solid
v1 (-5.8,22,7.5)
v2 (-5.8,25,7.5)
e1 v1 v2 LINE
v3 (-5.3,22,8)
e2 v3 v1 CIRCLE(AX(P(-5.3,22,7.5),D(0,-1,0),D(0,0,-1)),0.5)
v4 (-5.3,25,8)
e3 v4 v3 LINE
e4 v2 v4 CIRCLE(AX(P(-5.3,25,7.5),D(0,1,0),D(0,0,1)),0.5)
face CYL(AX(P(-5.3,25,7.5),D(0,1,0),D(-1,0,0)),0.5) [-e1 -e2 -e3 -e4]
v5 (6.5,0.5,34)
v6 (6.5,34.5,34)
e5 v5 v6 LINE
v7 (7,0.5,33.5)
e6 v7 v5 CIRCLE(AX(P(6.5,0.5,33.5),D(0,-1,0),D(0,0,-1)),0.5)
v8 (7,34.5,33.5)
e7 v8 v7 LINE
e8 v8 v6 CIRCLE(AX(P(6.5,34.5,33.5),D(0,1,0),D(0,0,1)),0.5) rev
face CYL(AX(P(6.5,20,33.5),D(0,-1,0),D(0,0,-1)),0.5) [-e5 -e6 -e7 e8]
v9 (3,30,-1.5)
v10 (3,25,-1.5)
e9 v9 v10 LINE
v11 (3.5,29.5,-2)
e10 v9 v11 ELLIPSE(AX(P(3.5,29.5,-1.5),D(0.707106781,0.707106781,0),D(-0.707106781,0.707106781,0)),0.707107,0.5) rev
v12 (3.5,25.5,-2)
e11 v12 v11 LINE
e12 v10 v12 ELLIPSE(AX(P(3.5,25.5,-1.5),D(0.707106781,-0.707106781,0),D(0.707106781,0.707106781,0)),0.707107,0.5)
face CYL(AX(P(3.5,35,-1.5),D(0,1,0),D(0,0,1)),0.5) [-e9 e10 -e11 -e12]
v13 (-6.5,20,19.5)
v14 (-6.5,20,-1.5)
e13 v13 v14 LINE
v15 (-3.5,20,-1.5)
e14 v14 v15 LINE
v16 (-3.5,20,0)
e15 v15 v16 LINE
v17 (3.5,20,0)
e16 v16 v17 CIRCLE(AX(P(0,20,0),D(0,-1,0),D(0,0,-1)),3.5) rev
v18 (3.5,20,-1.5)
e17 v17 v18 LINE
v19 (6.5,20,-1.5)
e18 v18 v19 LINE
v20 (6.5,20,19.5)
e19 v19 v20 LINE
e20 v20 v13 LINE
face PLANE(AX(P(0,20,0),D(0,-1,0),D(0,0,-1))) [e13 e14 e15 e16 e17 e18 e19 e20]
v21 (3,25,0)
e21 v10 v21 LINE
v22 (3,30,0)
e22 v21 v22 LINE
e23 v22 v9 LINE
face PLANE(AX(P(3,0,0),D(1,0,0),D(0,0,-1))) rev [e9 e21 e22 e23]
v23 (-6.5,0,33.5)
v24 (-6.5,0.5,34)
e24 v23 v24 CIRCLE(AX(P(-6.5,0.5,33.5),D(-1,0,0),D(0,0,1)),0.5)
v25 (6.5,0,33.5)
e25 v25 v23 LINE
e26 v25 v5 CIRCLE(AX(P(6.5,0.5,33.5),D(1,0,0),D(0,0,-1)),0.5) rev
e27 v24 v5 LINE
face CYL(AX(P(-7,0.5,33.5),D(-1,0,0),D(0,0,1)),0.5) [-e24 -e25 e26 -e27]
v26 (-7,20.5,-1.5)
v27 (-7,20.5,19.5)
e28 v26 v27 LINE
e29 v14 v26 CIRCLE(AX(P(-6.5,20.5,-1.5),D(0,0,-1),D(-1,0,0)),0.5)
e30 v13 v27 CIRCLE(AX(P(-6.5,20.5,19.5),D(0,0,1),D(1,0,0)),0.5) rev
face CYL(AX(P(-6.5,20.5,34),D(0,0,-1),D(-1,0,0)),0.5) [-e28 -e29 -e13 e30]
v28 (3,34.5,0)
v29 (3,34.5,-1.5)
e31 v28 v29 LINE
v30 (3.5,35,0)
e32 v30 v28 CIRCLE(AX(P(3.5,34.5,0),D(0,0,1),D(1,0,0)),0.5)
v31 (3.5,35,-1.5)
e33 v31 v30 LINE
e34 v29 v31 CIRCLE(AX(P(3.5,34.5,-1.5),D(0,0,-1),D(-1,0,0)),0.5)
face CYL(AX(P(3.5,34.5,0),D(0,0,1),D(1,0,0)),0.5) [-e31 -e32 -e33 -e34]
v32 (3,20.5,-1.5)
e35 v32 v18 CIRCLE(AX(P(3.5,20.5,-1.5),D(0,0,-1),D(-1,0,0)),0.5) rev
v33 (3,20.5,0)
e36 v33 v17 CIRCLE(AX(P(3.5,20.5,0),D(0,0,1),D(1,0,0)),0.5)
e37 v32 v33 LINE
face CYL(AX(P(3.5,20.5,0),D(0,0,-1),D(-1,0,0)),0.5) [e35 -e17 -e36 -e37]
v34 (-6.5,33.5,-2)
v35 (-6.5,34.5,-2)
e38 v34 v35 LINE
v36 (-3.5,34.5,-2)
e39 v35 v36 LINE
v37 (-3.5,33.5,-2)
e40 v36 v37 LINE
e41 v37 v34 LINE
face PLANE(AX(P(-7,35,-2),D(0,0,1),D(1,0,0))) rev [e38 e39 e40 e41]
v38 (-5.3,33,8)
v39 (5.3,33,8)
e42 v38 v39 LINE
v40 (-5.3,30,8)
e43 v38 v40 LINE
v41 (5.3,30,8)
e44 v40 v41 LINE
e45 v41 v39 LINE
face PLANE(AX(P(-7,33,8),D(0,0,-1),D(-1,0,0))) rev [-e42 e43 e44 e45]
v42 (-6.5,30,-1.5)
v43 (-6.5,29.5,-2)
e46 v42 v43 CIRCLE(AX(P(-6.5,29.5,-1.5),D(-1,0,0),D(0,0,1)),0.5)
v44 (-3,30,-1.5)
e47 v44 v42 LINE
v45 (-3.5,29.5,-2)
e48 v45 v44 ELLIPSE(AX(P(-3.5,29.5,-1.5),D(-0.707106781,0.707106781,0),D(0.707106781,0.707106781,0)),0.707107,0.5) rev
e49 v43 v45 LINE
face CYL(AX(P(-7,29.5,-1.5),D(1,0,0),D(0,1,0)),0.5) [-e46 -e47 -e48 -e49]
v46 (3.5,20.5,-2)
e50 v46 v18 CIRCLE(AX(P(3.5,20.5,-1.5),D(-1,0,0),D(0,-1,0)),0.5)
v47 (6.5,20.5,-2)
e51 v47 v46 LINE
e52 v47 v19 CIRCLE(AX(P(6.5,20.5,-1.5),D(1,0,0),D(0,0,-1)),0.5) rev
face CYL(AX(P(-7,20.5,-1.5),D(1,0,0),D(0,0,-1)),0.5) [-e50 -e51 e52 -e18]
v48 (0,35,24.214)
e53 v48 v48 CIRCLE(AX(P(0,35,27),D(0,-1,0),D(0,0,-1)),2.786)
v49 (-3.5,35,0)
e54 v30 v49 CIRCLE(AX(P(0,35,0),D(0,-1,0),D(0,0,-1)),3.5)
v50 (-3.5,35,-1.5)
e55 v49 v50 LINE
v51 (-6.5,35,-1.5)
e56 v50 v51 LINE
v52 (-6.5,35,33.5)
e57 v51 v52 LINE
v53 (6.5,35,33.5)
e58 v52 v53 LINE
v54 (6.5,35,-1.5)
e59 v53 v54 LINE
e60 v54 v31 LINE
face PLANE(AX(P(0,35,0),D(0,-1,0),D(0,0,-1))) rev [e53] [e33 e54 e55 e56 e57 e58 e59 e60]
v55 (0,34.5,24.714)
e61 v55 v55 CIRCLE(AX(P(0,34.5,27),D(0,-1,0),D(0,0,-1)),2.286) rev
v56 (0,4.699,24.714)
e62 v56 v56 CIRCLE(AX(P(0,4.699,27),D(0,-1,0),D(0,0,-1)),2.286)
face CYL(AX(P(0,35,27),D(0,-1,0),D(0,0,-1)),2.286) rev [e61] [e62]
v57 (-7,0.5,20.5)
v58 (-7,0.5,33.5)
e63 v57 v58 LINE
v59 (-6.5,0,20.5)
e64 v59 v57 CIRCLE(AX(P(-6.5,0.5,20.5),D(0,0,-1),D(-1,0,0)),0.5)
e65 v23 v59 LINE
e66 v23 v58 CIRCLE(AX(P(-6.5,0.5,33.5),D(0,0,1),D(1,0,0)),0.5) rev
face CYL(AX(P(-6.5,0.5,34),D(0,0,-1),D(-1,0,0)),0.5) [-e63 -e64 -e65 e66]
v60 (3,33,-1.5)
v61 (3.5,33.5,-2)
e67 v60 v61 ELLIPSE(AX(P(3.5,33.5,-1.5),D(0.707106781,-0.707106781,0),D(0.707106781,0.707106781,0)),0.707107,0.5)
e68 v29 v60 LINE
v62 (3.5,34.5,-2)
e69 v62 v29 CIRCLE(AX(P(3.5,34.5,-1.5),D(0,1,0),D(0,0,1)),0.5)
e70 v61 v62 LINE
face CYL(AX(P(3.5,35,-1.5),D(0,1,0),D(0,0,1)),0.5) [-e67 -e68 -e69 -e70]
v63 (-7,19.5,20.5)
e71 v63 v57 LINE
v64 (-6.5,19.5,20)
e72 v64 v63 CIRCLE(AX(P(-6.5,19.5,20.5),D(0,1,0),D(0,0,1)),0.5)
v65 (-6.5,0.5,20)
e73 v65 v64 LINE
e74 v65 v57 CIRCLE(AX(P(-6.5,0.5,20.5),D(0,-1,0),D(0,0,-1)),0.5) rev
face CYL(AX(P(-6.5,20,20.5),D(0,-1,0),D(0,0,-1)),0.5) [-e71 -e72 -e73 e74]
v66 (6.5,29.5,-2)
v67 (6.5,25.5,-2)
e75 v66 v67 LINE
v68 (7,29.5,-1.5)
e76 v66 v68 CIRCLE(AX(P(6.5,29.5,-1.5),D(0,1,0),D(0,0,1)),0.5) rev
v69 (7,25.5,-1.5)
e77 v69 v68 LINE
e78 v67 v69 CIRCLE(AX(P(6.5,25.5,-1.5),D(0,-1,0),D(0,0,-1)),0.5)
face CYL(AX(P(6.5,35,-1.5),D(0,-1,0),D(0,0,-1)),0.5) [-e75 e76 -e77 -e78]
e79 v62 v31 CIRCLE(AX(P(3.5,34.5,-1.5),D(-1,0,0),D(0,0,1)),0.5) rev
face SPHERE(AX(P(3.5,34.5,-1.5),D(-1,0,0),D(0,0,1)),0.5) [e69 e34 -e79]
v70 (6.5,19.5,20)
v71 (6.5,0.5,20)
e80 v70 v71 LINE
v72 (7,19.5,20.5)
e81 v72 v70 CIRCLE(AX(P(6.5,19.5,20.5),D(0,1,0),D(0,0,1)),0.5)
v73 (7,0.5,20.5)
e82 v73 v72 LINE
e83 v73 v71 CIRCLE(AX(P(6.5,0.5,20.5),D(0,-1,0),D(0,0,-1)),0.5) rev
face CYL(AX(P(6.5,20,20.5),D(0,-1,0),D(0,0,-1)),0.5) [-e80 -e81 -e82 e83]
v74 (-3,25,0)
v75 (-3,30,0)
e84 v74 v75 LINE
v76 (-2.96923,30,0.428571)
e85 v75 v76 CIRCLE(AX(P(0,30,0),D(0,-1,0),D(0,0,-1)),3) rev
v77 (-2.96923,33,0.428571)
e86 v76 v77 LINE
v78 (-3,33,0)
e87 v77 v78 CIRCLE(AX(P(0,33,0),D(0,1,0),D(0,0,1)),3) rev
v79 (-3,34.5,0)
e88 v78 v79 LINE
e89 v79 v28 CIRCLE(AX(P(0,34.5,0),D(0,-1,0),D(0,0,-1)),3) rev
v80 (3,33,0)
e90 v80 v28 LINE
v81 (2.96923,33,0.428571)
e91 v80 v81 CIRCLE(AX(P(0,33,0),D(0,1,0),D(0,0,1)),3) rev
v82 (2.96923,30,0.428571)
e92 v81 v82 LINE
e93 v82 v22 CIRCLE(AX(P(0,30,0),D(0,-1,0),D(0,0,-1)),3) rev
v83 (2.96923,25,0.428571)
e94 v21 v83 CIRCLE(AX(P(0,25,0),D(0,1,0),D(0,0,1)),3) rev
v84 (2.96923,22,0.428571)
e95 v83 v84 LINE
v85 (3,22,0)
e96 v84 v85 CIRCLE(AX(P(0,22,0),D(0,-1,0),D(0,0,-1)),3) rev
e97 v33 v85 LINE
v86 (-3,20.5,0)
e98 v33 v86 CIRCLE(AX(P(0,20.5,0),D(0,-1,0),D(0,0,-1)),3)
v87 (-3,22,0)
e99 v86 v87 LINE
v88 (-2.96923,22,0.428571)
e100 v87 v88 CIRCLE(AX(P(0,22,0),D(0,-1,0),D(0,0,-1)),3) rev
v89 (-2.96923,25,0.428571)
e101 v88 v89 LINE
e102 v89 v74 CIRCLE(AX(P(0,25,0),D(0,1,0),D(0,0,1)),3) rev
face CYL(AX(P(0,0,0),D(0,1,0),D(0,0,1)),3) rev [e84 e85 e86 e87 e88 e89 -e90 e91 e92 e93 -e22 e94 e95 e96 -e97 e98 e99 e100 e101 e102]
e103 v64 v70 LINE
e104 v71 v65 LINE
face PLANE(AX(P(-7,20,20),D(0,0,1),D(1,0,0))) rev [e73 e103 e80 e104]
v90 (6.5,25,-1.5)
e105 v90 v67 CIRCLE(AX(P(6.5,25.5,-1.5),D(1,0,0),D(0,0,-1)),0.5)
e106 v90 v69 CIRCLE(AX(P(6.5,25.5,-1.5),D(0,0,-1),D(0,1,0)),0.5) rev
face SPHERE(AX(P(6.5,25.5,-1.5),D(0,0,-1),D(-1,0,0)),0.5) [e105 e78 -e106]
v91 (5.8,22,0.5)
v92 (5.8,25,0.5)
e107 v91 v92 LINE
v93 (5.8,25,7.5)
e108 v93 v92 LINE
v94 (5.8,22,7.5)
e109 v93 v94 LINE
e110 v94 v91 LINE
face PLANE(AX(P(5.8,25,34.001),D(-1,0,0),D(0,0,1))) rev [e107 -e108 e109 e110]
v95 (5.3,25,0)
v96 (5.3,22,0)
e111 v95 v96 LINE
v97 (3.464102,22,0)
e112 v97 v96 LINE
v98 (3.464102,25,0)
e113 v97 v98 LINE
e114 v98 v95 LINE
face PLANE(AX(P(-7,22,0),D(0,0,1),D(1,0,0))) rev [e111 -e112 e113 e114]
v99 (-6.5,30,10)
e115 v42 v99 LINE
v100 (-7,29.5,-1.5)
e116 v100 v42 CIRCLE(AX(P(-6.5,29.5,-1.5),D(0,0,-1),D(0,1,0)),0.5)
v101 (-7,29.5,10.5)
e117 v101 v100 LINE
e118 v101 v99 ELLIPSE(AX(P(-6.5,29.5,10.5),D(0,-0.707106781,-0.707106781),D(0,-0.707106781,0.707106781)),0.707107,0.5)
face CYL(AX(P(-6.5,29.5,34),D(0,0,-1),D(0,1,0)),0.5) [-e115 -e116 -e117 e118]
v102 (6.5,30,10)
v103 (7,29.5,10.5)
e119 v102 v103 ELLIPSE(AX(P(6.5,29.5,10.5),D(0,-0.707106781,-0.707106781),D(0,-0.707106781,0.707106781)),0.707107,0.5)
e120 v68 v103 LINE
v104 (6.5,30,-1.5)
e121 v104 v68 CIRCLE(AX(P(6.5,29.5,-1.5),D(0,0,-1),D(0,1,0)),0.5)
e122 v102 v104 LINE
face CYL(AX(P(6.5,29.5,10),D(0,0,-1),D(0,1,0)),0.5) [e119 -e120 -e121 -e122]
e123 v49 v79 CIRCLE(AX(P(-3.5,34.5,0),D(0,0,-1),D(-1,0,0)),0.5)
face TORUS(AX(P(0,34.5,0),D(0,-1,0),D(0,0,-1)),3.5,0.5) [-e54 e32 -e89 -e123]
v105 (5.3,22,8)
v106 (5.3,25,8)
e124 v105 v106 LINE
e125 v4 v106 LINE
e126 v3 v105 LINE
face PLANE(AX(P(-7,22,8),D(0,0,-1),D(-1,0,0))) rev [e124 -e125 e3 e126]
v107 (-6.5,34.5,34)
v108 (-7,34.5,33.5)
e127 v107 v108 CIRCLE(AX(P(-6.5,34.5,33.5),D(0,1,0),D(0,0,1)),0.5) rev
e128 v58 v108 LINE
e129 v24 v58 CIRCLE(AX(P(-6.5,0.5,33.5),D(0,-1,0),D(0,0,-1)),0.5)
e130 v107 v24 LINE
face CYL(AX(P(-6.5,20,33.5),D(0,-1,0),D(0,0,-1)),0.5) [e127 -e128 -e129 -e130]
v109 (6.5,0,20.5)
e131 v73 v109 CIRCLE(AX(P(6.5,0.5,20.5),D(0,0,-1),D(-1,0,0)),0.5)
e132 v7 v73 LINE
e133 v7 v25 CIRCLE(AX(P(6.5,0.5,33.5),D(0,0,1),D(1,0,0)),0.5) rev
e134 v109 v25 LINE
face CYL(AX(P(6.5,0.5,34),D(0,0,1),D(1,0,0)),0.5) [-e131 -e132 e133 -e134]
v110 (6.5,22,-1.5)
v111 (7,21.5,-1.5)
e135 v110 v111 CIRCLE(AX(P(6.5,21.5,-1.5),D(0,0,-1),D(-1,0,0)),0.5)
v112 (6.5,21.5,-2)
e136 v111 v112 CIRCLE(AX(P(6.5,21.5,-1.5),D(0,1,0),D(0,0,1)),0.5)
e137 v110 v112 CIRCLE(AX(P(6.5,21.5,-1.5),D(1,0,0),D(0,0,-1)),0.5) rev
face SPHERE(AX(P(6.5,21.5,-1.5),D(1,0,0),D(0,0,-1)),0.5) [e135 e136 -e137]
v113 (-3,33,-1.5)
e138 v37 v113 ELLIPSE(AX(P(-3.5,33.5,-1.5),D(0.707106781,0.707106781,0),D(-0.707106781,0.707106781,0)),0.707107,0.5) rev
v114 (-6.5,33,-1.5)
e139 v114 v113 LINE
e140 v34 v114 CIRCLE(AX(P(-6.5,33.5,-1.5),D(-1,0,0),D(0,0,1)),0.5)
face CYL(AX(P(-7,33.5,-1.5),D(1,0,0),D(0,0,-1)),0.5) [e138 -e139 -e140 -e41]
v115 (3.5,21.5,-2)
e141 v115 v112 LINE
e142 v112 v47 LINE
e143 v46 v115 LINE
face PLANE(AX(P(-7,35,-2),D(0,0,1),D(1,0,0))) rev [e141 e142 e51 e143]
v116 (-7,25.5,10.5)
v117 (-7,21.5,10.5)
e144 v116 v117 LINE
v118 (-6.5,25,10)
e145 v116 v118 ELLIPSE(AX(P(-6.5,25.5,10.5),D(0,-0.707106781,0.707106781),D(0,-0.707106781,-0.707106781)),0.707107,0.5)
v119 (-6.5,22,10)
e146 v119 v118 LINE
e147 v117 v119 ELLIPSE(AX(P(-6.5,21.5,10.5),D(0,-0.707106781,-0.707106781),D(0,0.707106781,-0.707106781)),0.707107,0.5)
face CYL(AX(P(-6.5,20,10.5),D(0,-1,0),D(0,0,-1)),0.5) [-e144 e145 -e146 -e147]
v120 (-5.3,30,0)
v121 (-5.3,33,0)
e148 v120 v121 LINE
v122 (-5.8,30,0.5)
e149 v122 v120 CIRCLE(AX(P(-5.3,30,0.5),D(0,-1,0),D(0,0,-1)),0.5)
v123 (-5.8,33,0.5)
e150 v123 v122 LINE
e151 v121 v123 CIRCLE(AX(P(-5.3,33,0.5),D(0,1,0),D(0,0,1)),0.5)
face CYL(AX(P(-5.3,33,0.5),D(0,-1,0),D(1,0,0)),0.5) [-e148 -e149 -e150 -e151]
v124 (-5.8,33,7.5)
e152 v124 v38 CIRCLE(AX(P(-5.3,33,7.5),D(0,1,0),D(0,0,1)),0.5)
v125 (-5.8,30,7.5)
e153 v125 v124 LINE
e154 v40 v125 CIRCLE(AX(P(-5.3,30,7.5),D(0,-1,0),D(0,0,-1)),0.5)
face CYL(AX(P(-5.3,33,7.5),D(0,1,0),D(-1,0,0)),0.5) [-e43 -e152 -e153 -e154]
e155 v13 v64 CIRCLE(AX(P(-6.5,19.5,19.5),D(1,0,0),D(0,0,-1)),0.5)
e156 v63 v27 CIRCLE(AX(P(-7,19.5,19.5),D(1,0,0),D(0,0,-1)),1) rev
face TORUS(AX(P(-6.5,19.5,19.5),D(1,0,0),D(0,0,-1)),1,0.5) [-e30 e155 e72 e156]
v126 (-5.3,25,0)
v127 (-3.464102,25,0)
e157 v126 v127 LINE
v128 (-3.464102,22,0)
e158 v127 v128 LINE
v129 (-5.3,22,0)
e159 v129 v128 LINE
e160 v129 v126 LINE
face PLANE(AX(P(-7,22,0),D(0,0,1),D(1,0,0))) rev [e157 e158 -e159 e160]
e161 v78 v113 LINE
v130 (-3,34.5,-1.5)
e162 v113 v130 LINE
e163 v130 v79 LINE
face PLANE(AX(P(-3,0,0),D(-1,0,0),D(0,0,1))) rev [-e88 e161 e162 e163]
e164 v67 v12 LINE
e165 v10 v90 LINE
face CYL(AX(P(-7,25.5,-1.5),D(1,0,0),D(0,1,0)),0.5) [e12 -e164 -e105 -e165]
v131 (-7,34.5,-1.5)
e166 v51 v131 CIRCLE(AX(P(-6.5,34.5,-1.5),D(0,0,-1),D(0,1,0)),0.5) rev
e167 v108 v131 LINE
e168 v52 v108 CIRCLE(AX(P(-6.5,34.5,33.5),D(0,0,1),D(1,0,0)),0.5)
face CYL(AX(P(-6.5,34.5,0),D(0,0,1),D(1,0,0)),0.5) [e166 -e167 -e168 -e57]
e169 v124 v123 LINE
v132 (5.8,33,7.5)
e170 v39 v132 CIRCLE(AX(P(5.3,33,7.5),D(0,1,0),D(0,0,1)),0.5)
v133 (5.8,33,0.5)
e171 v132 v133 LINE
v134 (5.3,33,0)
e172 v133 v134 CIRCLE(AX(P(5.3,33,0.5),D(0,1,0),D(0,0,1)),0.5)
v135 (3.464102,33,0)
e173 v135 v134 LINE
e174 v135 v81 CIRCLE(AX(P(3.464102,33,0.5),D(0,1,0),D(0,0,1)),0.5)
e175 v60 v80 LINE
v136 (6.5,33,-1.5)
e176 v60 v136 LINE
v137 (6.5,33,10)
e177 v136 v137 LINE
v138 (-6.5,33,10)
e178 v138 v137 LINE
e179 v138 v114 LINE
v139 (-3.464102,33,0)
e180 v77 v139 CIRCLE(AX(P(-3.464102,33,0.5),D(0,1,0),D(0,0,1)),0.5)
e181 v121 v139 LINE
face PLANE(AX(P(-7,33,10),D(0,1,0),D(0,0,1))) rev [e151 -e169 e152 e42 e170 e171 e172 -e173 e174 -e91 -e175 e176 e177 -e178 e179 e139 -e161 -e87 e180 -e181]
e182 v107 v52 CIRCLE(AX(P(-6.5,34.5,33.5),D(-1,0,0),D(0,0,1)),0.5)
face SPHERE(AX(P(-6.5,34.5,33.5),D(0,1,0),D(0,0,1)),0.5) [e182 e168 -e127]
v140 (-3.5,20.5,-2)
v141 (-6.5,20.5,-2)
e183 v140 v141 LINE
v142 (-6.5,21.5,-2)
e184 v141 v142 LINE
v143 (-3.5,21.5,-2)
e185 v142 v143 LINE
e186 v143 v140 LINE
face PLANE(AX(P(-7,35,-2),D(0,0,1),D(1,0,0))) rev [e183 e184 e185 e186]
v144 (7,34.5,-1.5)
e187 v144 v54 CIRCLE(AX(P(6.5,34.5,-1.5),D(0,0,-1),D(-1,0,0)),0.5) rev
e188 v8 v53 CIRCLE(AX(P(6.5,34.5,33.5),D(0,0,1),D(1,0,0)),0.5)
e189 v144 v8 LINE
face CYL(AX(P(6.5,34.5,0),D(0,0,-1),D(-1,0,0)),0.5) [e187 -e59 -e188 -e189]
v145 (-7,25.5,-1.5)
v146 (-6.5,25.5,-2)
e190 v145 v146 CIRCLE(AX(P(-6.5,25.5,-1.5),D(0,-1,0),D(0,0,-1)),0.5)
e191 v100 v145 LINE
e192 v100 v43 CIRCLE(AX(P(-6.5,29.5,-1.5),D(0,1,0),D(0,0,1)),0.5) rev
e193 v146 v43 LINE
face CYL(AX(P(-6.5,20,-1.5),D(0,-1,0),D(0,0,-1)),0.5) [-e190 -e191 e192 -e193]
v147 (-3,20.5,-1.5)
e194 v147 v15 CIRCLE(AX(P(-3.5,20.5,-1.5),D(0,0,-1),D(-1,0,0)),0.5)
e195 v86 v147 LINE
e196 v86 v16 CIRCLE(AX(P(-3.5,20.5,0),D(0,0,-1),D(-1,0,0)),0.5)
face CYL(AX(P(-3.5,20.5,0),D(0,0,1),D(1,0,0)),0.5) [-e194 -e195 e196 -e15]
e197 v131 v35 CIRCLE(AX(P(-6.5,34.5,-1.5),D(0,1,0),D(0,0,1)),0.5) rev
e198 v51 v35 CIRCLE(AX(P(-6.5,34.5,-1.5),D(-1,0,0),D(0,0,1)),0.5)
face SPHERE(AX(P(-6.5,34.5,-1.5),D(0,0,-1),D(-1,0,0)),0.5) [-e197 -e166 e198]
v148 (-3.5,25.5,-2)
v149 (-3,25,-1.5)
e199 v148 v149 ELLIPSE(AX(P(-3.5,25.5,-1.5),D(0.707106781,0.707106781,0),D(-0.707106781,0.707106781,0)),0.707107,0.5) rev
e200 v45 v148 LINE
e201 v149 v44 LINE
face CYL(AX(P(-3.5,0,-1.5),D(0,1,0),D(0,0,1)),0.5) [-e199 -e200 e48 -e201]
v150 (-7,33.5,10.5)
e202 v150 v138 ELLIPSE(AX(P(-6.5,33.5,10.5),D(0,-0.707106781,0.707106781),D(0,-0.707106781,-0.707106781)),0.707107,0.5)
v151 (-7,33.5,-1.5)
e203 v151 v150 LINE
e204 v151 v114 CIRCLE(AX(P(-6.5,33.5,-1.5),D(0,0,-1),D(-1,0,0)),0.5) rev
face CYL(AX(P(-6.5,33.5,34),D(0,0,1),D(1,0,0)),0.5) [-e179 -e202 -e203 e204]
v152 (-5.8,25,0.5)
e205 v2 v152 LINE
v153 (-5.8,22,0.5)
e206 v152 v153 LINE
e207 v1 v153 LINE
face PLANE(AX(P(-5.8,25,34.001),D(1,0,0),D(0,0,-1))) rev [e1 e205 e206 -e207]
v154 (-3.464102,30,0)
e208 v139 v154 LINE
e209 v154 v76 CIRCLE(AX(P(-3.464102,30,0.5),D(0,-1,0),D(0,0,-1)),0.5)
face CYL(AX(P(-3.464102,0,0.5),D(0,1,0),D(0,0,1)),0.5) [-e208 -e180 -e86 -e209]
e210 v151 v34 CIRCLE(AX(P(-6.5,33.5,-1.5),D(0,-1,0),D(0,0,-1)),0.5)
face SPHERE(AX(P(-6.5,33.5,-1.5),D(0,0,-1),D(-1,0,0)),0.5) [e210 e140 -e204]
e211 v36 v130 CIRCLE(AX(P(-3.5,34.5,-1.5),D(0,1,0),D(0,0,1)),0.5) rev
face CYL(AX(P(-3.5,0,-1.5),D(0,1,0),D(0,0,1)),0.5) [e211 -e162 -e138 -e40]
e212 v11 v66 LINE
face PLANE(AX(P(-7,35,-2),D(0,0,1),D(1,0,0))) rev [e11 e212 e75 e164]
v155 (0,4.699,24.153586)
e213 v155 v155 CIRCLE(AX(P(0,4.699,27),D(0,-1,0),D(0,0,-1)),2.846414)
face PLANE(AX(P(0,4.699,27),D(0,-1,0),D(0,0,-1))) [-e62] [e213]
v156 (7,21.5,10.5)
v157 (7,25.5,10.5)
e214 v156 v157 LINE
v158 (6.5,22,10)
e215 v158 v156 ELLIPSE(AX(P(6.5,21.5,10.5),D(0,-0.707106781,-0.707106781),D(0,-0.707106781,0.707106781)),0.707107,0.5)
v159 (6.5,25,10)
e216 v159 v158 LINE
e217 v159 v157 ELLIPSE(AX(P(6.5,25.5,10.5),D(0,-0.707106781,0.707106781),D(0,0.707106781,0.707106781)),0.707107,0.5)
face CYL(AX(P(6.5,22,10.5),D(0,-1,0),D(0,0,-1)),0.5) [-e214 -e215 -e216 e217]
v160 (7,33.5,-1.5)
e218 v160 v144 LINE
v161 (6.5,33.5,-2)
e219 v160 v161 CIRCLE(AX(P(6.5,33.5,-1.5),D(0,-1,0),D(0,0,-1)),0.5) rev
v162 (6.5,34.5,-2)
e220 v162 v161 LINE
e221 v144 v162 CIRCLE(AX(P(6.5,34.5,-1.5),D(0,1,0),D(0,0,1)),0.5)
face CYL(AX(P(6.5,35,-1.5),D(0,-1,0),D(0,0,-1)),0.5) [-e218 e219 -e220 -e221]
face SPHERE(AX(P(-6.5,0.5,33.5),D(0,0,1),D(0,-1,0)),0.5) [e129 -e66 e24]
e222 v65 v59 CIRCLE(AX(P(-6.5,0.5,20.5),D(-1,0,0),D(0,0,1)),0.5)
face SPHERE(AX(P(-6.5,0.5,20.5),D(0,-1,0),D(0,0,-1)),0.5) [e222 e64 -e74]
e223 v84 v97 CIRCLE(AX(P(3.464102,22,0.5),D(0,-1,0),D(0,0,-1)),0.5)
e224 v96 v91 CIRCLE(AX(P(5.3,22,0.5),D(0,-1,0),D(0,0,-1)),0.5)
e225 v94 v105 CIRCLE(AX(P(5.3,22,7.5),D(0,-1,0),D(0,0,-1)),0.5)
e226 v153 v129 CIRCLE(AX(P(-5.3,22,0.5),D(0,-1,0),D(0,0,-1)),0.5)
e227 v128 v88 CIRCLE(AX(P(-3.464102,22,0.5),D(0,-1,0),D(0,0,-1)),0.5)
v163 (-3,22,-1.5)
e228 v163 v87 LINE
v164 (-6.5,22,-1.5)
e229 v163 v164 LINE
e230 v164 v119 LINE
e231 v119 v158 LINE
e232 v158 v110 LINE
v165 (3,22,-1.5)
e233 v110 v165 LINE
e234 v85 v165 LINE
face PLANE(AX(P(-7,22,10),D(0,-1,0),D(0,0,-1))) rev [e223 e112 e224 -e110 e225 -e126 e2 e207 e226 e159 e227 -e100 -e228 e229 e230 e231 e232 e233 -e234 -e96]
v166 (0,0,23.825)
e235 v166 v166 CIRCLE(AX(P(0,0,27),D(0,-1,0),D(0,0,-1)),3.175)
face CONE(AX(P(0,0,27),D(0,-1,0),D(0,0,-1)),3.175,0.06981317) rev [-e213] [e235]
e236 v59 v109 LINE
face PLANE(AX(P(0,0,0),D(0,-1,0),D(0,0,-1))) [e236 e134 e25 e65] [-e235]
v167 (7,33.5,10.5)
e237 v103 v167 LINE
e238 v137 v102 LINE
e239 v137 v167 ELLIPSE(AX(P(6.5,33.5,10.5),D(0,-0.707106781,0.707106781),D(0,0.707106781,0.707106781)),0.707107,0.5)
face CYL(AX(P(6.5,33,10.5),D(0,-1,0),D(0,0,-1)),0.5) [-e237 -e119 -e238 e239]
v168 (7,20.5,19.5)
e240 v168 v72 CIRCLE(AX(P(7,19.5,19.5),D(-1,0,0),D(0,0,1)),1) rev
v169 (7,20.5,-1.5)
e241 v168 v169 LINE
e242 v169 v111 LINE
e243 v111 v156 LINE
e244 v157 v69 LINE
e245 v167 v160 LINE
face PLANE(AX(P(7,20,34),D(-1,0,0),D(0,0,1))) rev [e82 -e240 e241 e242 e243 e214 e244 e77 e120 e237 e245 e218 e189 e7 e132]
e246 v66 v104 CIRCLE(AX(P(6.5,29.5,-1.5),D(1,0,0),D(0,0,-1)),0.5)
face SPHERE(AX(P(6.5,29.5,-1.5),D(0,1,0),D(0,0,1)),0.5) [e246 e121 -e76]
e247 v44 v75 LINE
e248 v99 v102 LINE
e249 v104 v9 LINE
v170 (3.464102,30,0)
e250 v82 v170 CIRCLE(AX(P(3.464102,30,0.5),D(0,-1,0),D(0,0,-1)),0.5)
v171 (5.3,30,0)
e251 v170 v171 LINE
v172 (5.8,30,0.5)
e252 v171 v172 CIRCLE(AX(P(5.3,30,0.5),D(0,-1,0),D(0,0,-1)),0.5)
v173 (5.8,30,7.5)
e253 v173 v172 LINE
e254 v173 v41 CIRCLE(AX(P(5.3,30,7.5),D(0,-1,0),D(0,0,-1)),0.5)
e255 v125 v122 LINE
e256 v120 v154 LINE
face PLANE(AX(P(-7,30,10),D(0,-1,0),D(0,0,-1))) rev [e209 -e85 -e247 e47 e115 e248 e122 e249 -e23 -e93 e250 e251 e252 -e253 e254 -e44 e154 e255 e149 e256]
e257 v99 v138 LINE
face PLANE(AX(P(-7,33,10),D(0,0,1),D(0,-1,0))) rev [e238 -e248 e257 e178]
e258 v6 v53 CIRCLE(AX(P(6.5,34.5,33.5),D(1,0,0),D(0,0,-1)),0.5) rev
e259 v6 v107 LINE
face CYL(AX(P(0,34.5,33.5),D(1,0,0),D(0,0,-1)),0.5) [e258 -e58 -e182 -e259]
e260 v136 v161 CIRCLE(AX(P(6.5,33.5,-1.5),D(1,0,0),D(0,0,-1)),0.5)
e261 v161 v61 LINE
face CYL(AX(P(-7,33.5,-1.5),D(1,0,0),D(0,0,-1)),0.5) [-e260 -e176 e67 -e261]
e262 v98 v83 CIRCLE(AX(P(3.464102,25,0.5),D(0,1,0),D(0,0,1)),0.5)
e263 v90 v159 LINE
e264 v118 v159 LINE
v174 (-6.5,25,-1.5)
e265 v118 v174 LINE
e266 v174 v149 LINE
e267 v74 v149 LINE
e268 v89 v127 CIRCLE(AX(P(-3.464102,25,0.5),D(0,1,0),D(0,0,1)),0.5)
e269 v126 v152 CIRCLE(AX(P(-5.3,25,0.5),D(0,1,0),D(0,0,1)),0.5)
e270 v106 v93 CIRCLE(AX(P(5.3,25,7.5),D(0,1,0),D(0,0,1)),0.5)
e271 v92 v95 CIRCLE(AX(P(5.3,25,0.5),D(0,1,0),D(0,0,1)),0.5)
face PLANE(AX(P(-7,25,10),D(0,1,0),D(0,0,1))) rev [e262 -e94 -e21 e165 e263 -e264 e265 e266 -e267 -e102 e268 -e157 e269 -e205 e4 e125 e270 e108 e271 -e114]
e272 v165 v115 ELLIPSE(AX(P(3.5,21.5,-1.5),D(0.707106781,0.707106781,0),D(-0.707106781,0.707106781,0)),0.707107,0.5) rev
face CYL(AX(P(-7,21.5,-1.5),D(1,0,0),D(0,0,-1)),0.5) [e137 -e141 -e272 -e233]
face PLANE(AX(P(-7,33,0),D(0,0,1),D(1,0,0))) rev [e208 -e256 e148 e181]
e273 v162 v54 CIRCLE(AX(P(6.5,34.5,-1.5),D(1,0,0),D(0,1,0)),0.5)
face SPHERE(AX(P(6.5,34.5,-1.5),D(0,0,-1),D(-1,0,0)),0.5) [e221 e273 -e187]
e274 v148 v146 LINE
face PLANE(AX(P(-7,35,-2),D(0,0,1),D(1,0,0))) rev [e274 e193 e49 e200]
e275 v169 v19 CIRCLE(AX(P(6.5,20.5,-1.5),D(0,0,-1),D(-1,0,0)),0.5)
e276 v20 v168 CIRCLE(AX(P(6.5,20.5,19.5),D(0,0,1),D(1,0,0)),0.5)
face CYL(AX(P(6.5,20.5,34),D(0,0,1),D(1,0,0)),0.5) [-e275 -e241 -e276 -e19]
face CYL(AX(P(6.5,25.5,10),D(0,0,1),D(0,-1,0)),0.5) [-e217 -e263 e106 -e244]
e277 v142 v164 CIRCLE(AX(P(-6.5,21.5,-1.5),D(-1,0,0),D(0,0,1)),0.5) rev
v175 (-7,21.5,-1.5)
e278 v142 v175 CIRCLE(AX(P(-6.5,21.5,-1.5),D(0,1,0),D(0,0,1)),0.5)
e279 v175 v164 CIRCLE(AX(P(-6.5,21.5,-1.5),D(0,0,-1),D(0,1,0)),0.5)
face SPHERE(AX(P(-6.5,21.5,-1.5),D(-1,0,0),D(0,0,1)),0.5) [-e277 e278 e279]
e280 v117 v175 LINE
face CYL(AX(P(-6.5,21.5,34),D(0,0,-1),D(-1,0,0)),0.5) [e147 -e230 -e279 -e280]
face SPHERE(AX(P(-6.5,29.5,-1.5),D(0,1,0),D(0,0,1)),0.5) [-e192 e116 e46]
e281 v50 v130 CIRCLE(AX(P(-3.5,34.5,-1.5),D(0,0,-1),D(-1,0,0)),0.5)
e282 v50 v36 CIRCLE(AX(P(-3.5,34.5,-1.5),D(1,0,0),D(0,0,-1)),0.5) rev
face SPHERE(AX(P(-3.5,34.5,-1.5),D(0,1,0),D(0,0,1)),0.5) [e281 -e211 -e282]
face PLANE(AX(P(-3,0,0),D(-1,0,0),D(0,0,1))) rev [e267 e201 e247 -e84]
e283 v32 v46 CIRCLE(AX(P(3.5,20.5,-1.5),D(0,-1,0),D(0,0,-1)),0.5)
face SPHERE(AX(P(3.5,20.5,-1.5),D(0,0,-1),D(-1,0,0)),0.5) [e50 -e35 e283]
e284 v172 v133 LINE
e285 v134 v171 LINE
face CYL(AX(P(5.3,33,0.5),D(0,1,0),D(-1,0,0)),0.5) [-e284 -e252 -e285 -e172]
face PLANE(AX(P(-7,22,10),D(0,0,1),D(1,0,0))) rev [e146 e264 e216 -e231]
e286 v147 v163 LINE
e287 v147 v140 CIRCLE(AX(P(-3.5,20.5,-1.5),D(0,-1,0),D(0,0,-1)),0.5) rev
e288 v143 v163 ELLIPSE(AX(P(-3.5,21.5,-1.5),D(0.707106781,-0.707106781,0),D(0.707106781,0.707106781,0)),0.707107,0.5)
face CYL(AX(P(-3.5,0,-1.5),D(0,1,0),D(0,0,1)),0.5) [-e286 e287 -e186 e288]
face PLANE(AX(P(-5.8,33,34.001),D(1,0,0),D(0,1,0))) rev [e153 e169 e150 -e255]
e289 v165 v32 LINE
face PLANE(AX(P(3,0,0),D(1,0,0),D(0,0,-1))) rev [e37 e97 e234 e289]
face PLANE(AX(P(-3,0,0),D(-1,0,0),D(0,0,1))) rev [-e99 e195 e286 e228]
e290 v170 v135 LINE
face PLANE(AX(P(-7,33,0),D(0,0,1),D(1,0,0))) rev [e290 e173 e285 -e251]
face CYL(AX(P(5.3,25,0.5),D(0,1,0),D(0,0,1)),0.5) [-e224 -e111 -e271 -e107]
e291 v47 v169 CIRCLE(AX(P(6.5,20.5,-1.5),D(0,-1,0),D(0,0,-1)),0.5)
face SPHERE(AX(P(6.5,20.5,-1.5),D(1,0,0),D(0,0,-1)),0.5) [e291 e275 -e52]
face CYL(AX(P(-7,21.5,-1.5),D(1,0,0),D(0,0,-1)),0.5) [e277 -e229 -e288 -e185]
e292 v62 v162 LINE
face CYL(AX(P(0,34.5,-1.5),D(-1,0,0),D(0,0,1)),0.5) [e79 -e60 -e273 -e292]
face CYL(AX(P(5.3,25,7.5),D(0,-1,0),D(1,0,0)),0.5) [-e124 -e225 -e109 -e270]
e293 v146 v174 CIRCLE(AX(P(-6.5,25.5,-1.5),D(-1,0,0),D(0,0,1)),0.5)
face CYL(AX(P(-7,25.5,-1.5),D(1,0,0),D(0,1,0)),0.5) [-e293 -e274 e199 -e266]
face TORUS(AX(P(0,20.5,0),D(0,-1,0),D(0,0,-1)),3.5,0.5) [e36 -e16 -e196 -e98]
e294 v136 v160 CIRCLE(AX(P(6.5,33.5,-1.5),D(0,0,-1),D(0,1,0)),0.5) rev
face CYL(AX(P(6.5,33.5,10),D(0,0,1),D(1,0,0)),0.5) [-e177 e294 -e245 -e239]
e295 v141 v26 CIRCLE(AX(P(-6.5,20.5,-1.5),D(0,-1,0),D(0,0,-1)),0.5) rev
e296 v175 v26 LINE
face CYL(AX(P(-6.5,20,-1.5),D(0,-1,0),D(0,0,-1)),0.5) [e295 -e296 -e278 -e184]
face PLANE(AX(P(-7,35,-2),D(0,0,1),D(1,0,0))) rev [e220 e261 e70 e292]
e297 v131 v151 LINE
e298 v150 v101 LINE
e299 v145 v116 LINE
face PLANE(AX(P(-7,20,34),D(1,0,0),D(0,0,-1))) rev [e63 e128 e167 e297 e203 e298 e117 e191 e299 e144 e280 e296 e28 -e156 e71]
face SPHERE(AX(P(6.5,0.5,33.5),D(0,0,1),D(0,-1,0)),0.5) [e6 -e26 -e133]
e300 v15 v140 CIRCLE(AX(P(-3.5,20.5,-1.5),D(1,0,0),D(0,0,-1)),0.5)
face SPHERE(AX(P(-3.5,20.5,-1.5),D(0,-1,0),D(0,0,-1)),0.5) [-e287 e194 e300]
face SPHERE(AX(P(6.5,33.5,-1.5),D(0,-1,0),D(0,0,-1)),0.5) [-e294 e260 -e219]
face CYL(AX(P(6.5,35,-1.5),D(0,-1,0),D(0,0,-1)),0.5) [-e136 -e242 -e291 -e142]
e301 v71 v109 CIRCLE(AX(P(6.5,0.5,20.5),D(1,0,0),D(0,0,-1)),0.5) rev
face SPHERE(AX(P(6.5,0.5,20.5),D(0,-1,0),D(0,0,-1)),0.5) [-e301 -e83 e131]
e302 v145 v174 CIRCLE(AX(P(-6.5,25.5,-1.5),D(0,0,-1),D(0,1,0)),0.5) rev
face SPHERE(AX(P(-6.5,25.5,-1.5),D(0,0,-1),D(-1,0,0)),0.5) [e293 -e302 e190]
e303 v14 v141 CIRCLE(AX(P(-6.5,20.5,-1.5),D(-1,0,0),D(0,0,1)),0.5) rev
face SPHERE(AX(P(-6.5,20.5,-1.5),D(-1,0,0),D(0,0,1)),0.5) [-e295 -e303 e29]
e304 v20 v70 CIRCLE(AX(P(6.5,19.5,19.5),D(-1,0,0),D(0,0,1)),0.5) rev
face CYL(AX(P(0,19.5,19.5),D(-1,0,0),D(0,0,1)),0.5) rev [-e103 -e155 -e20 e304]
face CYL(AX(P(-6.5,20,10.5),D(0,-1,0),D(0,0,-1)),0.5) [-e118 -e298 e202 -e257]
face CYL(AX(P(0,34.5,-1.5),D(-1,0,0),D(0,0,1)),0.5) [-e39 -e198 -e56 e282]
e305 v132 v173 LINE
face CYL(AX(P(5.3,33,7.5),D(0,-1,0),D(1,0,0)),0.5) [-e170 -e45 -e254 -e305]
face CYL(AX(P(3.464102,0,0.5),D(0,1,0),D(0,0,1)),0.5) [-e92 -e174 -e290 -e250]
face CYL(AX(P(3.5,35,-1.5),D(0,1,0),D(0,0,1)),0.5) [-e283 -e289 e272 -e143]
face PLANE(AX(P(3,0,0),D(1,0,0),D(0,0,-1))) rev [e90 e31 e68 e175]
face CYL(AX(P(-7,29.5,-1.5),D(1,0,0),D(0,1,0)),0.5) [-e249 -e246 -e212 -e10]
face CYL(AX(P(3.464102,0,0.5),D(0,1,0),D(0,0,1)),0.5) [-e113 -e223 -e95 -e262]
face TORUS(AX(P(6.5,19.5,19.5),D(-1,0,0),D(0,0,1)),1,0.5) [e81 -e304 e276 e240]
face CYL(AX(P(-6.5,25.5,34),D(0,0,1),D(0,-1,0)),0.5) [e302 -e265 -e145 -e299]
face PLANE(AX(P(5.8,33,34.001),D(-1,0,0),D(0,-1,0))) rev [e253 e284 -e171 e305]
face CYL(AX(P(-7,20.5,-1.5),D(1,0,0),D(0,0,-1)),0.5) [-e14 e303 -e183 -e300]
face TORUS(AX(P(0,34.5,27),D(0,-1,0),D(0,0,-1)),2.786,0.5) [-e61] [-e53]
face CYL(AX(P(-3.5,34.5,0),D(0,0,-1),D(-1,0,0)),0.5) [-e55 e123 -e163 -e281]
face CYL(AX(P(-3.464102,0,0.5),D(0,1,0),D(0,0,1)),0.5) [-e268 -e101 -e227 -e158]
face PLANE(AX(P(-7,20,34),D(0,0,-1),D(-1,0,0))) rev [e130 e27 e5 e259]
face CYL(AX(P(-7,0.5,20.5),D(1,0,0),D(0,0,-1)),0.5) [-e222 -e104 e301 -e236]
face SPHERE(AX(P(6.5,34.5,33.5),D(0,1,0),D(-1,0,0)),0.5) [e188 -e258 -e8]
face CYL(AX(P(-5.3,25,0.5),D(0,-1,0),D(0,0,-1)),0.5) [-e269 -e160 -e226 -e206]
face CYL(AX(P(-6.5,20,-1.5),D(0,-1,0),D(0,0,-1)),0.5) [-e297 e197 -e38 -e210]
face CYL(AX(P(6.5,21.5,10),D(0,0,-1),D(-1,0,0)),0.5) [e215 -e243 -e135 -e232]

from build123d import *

# Parameters (mm, degrees)
SKETCH1_W               = 14
SKETCH1_H               = 14
BOSS_EXTRUDE1_DEPTH     = 20
SKETCH3_W               = 14
SKETCH3_H               = 36
BOSS_EXTRUDE2_DEPTH     = 15
CUT_EXTRUDE1_DEPTH      = 50.295030175
CUT_EXTRUDE1_DEPTH_BACK = 50.295030175
CUT_EXTRUDE2_DEPTH      = 51.764160586
CUT_EXTRUDE2_DEPTH_BACK = 51.764160586
SKETCH5_W               = 2
SKETCH5_H               = 3
CUT_EXTRUDE3_REACH      = 51.295
SKETCH6_W               = 1.2
SKETCH6_H               = 3
SKETCH7_R               = 3.175
CUT_EXTRUDE4_DEPTH      = 4.699
SKETCH8_R               = 2.286
CUT_EXTRUDE5_DEPTH      = 47.077658371
FILLET1_R               = 0.5
FILLET2_R               = 0.5
DRAFT1_ANGLE            = 4


with BuildPart() as part:
    # Sketch1 → Boss-Extrude1 (new body)
    with BuildSketch(Plane(origin=(0, 0, 0), x_dir=(1, 0, 0), z_dir=(0, 1, 0))):
        with Locations((0, -27)):
            Rectangle(SKETCH1_W, SKETCH1_H)
    extrude(amount=BOSS_EXTRUDE1_DEPTH)

    # Sketch3 → Boss-Extrude2 (add)
    with BuildSketch(Plane(origin=(0, 20, 0), x_dir=(1, 0, 0), z_dir=(0, 1, 0))):
        with Locations((0, -16)):
            Rectangle(SKETCH3_W, SKETCH3_H)
    extrude(amount=BOSS_EXTRUDE2_DEPTH)

    # Sketch4 → Cut-Extrude1 (cut, two sides: drawn at the far end of the back side and taken through both)
    with BuildSketch(Plane(origin=(0, 35, 0), x_dir=(1, 0, 0), z_dir=(0, 1, 0)).offset(-CUT_EXTRUDE1_DEPTH_BACK)):
        with BuildLine():
            Line((-3, 0), (-3, 2))
            Line((-3, 2), (3, 2))
            Line((3, 2), (3, 0))
            ThreePointArc((3, 0), (0, -3), (-3, 0))
        make_face()
    extrude(amount=CUT_EXTRUDE1_DEPTH + CUT_EXTRUDE1_DEPTH_BACK, mode=Mode.SUBTRACT)

    # Sketch5 → Cut-Extrude2 (cut, two sides: drawn at the far end of the back side and taken through both)
    with BuildSketch(Plane(origin=(7, 0, 0), x_dir=(0, 0, -1), z_dir=(1, 0, 0)).offset(-CUT_EXTRUDE2_DEPTH_BACK)):
        with Locations((1, 31.5)):
            Rectangle(SKETCH5_W, SKETCH5_H)
        with Locations((1, 23.5)):
            Rectangle(SKETCH5_W, SKETCH5_H)
        with Locations((-9, 23.5)):
            Rectangle(SKETCH5_W, SKETCH5_H)
        with Locations((-9, 31.5)):
            Rectangle(SKETCH5_W, SKETCH5_H)
    extrude(amount=CUT_EXTRUDE2_DEPTH + CUT_EXTRUDE2_DEPTH_BACK, mode=Mode.SUBTRACT)

    # Sketch6 → Cut-Extrude3 (cut, up to next)
    with BuildSketch(Plane(origin=(0, 0, 0), x_dir=(-1, 0, 0), z_dir=(0, 0, -1)), mode=Mode.PRIVATE) as cut_extrude3_sk1:
        with Locations((-6.4, 31.5)):
            Rectangle(SKETCH6_W, SKETCH6_H)
    cut_extrude3_tool1 = extrude(cut_extrude3_sk1.sketch, amount=-CUT_EXTRUDE3_REACH, mode=Mode.PRIVATE) & part.part
    # Sketch6 → Cut-Extrude3 (cut, up to next)
    with BuildSketch(Plane(origin=(0, 0, 0), x_dir=(-1, 0, 0), z_dir=(0, 0, -1)), mode=Mode.PRIVATE) as cut_extrude3_sk2:
        with Locations((6.4, 31.5)):
            Rectangle(SKETCH6_W, SKETCH6_H)
    cut_extrude3_tool2 = extrude(cut_extrude3_sk2.sketch, amount=-CUT_EXTRUDE3_REACH, mode=Mode.PRIVATE) & part.part
    # Sketch6 → Cut-Extrude3 (cut, up to next)
    with BuildSketch(Plane(origin=(0, 0, 0), x_dir=(-1, 0, 0), z_dir=(0, 0, -1)), mode=Mode.PRIVATE) as cut_extrude3_sk3:
        with Locations((-6.4, 23.5)):
            Rectangle(SKETCH6_W, SKETCH6_H)
    cut_extrude3_tool3 = extrude(cut_extrude3_sk3.sketch, amount=-CUT_EXTRUDE3_REACH, mode=Mode.PRIVATE) & part.part
    # Sketch6 → Cut-Extrude3 (cut, up to next)
    with BuildSketch(Plane(origin=(0, 0, 0), x_dir=(-1, 0, 0), z_dir=(0, 0, -1)), mode=Mode.PRIVATE) as cut_extrude3_sk4:
        with Locations((6.4, 23.5)):
            Rectangle(SKETCH6_W, SKETCH6_H)
    cut_extrude3_tool4 = extrude(cut_extrude3_sk4.sketch, amount=-CUT_EXTRUDE3_REACH, mode=Mode.PRIVATE) & part.part
    add(cut_extrude3_tool1.solids().sort_by_distance((6.4, 31.5, 0))[0], mode=Mode.SUBTRACT)
    add(cut_extrude3_tool2.solids().sort_by_distance((-6.4, 31.5, 0))[0], mode=Mode.SUBTRACT)
    add(cut_extrude3_tool3.solids().sort_by_distance((6.4, 23.5, 0))[0], mode=Mode.SUBTRACT)
    add(cut_extrude3_tool4.solids().sort_by_distance((-6.4, 23.5, 0))[0], mode=Mode.SUBTRACT)

    # Sketch7 → Cut-Extrude4 (cut)
    with BuildSketch(Plane.XZ):
        with Locations(Location((0, 27, 0), (0, 0, 270))):
            Circle(SKETCH7_R)
    extrude(amount=-CUT_EXTRUDE4_DEPTH, mode=Mode.SUBTRACT)

    # Sketch8 → Cut-Extrude5 (cut, through all)
    with BuildSketch(Plane.XZ.offset(-4.699)):
        with Locations(Location((0, 27, 0), (0, 0, 270))):
            Circle(SKETCH8_R)
    extrude(amount=-CUT_EXTRUDE5_DEPTH, mode=Mode.SUBTRACT)

    # Fillet1
    fillet1_edges = [part.edges().sort_by_distance(p)[0] for p in [
        (-5, 33, -2),
        (5, 33, -2),
        (-5, 30, -2),
        (5, 30, -2),
        (-7, 20, 9),
        (-7, 34, -2),
        (7, 20, 9),
        (5, 20, -2),
        (7, 34, -2),
        (-7, 35, 16),
        (0, 35, 34),
        (7, 35, 16),
        (5, 35, -2),
        (0, 35, 29.286),
        (-5, 20, -2),
        (3, 20, -1),
        (0, 20, 3),
        (-3, 20, -1),
        (-5, 35, -2),
        (-3, 35, -1),
        (-3, 21, -2),
        (3, 21, -2),
        (3, 35, -1),
        (0, 35, 3),
        (0, 0, 34),
        (3, 27.5, -2),
        (3, 34, -2),
        (-7, 0, 27),
        (-3, 27.5, -2),
        (-3, 34, -2),
        (0, 0, 20),
        (7, 27.5, -2),
        (7, 21, -2),
        (-7, 27.5, -2),
        (7, 0, 27),
        (-7, 21, -2),
        (-7, 33, 4),
        (7, 17.5, 34),
        (-7, 30, 4),
        (-7, 31.5, 10),
        (-7, 17.5, 34),
        (7, 33, 4),
        (7, 31.5, 10),
        (7, 30, 4),
        (-7, 10, 20),
        (7, 10, 20),
        (-7, 22, 4),
        (-7, 23.5, 10),
        (-7, 25, 4),
        (7, 22, 4),
        (7, 25, 4),
        (7, 23.5, 10),
        (0, 20, 20),
        (-5, 22, -2),
        (5, 22, -2),
        (-5, 25, -2),
        (5, 25, -2),
    ]]
    fillet(fillet1_edges, radius=FILLET1_R)

    # Fillet2
    # the kernel refuses this fillet: 0.5 mm, written as the material it takes off along each edge
    with BuildSketch(Plane(origin=(-3, 30, 0), x_dir=(0.07161243393857297, 0, 0.9974325337111245), z_dir=(0, 1, 0)), Plane(origin=(-3, 22, 0), x_dir=(0.07161243393857297, 0, 0.9974325337111245), z_dir=(0, 1, 0))) as fillet2_piece_1:
        with BuildLine():
            CenterArc((0.465480821, -0.498716267), FILLET2_R, 94.106605351, 81.786789298)
            Line((-0.033235446, -0.46291005), (0, 0))
            ThreePointArc((0, 0), (0.214837302, -0.007702399), (0.429674604, 0))
        make_face()
    extrude(amount=3, mode=Mode.SUBTRACT)
    with BuildSketch(Plane(origin=(-5.8, 33, 8), x_dir=(1, 0, 0), z_dir=(0, -1, 0)), Plane(origin=(-5.8, 30, 0), x_dir=(1, 0, 0), z_dir=(0, 1, 0)), Plane(origin=(5.8, 25, 8), x_dir=(0, 0, -1), z_dir=(0, -1, 0)), Plane(origin=(5.8, 25, 0), x_dir=(-1, 0, 0), z_dir=(0, -1, 0)), Plane(origin=(-5.8, 22, 8), x_dir=(0, 0, -1), z_dir=(0, 1, 0)), Plane(origin=(-5.8, 22, 0), x_dir=(1, 0, 0), z_dir=(0, 1, 0)), Plane(origin=(5.8, 33, 0), x_dir=(-1, 0, 0), z_dir=(0, -1, 0))) as fillet2_piece_2:
        with BuildLine():
            CenterArc((FILLET2_R, -FILLET2_R), FILLET2_R, 90, 90)
            Line((0, -FILLET2_R), (0, 0))
            Line((0, 0), (FILLET2_R, 0))
        make_face()
    extrude(amount=3, mode=Mode.SUBTRACT)
    with BuildSketch(Plane(origin=(5.8, 30, 8), x_dir=(0, 0, -1), z_dir=(0, 1, 0))) as fillet2_piece_3:
        with BuildLine():
            CenterArc((FILLET2_R, FILLET2_R), FILLET2_R, 180, 90)
            Line((0, FILLET2_R), (0, 0))
            Line((0, 0), (FILLET2_R, 0))
        make_face()
    extrude(amount=3, mode=Mode.SUBTRACT)
    with BuildSketch(Plane(origin=(3, 22, 0), x_dir=(-0.07161243393857421, 0, 0.9974325337111244), z_dir=(0, 1, 0)), Plane(origin=(3, 30, 0), x_dir=(-0.07161243393857426, 0, 0.9974325337111244), z_dir=(0, 1, 0))) as fillet2_piece_4:
        with BuildLine():
            CenterArc((0.465480821, 0.498716267), FILLET2_R, 184.106605351, 81.786789298)
            Line((-0.033235446, 0.46291005), (0, 0))
            ThreePointArc((0, 0), (0.214837302, 0.007702399), (0.429674604, 0))
        make_face()
    extrude(amount=3, mode=Mode.SUBTRACT)

    # Draft1
    draft1_faces = [part.faces().sort_by_distance(p)[0] for p in [
        (0, 2.3495, 30.175),
    ]]
    draft(draft1_faces, Plane(origin=(0, 0, 0), x_dir=(0, 0, -1), z_dir=(0, -1, 0)), DRAFT1_ANGLE)


solid = part.part
